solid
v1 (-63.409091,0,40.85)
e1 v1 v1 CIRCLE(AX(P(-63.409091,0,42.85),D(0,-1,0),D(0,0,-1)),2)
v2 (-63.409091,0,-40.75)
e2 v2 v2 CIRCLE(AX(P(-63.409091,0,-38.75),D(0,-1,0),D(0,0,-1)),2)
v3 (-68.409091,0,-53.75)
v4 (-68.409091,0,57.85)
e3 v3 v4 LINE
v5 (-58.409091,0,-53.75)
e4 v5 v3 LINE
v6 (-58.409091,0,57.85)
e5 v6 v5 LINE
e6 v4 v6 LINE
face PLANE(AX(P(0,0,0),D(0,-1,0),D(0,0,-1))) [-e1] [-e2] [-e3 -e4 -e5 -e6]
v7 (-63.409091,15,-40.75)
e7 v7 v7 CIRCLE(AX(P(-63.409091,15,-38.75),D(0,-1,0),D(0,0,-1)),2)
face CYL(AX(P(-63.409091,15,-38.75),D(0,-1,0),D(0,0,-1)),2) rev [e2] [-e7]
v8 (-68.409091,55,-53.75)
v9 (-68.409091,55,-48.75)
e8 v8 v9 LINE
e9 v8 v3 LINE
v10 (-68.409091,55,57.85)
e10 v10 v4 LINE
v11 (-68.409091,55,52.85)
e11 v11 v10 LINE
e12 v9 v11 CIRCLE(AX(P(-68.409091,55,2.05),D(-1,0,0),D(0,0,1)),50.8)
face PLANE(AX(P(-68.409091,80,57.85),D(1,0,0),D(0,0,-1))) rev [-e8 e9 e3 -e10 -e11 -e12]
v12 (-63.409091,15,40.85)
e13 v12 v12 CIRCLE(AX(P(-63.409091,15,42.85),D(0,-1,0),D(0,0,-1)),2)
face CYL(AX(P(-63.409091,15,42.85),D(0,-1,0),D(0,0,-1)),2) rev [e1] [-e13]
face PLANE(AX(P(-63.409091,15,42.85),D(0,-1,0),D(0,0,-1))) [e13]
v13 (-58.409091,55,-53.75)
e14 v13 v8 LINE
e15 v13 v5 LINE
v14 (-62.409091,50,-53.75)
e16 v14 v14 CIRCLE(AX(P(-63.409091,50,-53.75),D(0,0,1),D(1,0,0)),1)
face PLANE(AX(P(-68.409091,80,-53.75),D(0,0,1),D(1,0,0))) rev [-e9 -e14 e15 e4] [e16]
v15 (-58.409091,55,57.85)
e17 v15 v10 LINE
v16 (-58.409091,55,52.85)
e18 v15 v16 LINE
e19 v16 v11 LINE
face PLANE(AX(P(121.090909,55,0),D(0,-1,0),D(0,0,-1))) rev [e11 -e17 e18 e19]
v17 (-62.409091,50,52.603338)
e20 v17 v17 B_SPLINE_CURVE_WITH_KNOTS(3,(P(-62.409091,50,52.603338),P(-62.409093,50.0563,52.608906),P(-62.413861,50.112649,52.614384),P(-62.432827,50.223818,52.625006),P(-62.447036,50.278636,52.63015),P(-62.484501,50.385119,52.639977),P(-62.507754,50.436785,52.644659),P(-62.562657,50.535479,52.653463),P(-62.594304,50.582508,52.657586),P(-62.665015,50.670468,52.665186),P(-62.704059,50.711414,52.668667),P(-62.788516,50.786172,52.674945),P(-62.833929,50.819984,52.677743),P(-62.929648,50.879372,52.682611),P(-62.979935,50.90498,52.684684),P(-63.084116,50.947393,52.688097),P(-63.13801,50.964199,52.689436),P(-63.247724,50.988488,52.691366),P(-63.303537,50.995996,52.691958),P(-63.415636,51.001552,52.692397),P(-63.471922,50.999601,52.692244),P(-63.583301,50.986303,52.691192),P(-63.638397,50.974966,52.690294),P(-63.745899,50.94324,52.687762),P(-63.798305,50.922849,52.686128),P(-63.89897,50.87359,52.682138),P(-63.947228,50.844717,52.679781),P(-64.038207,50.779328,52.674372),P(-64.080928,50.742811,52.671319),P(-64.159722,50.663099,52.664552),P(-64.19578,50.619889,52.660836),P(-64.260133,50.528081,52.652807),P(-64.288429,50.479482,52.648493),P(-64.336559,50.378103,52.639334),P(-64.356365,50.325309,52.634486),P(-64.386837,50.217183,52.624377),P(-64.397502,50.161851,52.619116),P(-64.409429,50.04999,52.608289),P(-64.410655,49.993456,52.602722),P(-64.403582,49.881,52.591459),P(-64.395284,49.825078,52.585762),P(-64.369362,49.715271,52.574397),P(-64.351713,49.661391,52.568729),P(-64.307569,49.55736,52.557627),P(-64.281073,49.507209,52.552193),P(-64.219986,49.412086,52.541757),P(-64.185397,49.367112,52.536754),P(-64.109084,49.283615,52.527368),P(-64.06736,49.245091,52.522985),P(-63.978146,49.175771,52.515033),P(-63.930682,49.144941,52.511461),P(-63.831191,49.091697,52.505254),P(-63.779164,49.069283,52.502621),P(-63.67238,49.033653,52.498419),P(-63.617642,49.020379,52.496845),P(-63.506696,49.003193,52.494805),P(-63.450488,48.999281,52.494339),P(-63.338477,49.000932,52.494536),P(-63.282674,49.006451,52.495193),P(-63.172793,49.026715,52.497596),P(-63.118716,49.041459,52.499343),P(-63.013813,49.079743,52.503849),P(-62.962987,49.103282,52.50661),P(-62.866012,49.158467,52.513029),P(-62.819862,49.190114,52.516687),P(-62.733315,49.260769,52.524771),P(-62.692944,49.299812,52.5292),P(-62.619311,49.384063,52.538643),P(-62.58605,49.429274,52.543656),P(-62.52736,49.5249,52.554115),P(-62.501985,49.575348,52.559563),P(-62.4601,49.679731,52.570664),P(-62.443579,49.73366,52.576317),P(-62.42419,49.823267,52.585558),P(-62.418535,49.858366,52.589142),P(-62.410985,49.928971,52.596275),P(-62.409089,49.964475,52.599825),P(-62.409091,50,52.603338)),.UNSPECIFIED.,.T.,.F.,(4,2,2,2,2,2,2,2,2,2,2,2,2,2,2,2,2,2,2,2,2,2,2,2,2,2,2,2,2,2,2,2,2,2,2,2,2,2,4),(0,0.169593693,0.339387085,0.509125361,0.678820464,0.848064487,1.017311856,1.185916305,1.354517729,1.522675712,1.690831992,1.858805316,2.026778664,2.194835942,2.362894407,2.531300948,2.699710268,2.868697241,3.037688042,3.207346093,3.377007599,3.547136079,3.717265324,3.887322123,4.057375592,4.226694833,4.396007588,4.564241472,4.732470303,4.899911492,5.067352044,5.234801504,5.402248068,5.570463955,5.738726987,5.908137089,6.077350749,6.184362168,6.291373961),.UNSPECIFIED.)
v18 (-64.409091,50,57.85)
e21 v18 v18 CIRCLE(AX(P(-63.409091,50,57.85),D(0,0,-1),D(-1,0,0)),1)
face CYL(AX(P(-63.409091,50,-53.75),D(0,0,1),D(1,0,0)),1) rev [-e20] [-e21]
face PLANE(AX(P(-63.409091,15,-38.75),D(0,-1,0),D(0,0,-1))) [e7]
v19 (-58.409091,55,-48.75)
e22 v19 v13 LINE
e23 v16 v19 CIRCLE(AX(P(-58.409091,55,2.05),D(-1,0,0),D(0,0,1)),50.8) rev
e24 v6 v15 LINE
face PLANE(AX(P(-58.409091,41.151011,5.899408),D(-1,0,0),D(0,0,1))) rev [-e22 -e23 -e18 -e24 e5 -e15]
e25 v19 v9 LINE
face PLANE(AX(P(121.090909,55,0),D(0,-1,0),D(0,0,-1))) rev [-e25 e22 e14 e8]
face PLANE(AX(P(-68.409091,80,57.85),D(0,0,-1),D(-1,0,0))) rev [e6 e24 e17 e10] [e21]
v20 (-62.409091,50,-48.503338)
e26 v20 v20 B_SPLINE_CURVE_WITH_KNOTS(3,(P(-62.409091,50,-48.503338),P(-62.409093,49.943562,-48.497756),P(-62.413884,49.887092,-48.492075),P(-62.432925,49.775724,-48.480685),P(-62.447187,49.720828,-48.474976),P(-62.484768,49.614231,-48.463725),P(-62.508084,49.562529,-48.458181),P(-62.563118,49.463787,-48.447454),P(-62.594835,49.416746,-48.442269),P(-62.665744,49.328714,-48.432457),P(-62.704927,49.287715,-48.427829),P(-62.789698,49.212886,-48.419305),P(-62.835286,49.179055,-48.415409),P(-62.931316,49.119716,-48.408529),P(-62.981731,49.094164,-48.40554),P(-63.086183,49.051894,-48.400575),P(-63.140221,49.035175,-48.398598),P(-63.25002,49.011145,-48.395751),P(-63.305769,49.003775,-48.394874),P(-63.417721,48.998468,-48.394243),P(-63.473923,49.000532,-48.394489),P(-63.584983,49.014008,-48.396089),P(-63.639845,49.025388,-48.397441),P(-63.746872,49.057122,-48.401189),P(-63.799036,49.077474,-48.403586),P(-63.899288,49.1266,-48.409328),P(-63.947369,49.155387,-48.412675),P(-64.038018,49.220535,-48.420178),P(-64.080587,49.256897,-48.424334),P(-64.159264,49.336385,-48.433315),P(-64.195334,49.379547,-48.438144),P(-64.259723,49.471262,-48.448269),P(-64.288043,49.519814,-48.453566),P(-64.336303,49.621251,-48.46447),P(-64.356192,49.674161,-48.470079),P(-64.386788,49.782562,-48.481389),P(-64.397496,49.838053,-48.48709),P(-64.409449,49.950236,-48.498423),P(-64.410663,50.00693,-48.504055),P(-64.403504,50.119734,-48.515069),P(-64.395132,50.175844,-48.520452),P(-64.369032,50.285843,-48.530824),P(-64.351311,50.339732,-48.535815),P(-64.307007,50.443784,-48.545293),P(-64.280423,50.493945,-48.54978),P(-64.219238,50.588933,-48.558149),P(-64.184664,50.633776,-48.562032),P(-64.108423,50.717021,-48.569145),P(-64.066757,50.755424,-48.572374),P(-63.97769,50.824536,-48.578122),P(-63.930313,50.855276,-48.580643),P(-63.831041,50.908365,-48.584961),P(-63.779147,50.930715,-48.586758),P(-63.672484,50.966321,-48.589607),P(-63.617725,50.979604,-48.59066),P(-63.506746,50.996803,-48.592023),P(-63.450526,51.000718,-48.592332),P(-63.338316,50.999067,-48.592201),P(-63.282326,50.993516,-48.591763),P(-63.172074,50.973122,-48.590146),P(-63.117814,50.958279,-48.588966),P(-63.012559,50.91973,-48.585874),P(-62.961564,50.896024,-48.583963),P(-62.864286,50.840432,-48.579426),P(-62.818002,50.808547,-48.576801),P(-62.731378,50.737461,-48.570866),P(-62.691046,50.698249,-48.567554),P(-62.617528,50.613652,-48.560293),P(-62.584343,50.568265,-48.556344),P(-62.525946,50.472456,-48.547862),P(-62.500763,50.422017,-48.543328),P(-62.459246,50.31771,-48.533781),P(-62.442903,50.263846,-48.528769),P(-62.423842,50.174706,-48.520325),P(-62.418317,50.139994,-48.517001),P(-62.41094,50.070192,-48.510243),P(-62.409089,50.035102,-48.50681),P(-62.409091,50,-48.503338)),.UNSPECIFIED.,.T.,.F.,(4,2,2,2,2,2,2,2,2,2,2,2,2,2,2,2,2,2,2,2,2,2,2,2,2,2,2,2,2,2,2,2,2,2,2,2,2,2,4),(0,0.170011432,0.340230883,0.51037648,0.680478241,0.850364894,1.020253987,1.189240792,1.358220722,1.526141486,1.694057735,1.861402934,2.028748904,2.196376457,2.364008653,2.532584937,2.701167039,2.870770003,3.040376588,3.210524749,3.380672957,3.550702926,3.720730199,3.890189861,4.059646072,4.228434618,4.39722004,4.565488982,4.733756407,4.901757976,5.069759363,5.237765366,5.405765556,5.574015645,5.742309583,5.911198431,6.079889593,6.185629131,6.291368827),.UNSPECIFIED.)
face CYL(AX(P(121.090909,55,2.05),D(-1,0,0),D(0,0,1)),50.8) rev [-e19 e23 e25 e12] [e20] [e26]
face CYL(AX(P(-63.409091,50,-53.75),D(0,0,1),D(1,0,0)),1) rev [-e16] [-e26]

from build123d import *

# Parameters (mm, degrees)
SKETCH1_W               = 189.5
SKETCH1_H               = 111.6
BOSS_EXTRUDE1_DEPTH     = 80
SKETCH3_R               = 8.15
CUT_EXTRUDE2_DEPTH      = 40
SKETCH4_R               = 10.3
CUT_EXTRUDE3_DEPTH      = 40
CUT_EXTRUDE1_DEPTH      = 214.674688487
CUT_EXTRUDE5_START      = -10
SKETCH5_R               = 83.637561864
CUT_EXTRUDE5_DEPTH      = 196.625563976
SKETCH6_R               = 2
CUT_EXTRUDE6_DEPTH      = 15
CUT_EXTRUDE7_DEPTH      = 142.983674128
CUT_EXTRUDE7_DEPTH_BACK = 142.983674128
SKETCH7_R               = 1


with BuildPart() as part:
    # Sketch1 → Boss-Extrude1 (new body)
    with BuildSketch(Plane(origin=(0, 0, 0), x_dir=(1, 0, 0), z_dir=(0, 1, 0))):
        with Locations((26.340909091, -2.05)):
            Rectangle(SKETCH1_W, SKETCH1_H)
    extrude(amount=BOSS_EXTRUDE1_DEPTH)

    # Sketch3 → Cut-Extrude2 (cut)
    with BuildSketch(Plane.XY.offset(57.85)):
        with Locations((-6.709090909, 45)):
            Circle(SKETCH3_R)
        with Locations((44.290909091, 45)):
            Circle(SKETCH3_R)
        with Locations((95.290909091, 45)):
            Circle(SKETCH3_R)
    extrude(amount=-CUT_EXTRUDE2_DEPTH, mode=Mode.SUBTRACT)

    # Sketch4 → Cut-Extrude3 (cut)
    with BuildSketch(Plane(origin=(0, 0, -53.75), x_dir=(-1, 0, 0), z_dir=(0, 0, -1))):
        with Locations((-18.790909091, 45)):
            Circle(SKETCH4_R)
    extrude(amount=-CUT_EXTRUDE3_DEPTH, mode=Mode.SUBTRACT)

    # Sketch2 → Cut-Extrude1 (cut, through all)
    with BuildSketch(Plane.ZY.offset(68.409090909)):
        with BuildLine():
            Line((-53.75, 80), (-53.75, 55))
            Line((-53.75, 55), (-48.75, 55))
            ThreePointArc((-48.75, 55), (2.05, 4.2), (52.85, 55))
            Line((52.85, 55), (57.85, 55))
            Line((57.85, 55), (57.85, 80))
            Line((57.85, 80), (-53.75, 80))
        make_face()
    extrude(amount=-CUT_EXTRUDE1_DEPTH, mode=Mode.SUBTRACT)

    # Sketch5 → Cut-Extrude5 (cut, through all)
    with BuildSketch(Plane.ZY.offset(68.409090909).offset(CUT_EXTRUDE5_START)):
        with Locations((5.899408019, 41.151011042)):
            Circle(SKETCH5_R)
    extrude(amount=-CUT_EXTRUDE5_DEPTH, mode=Mode.SUBTRACT)

    # Sketch6 → Cut-Extrude6 (cut)
    with BuildSketch(Plane.XZ):
        with Locations((-63.409090909, 42.85)):
            Circle(SKETCH6_R)
        with Locations((-63.409090909, -38.75)):
            Circle(SKETCH6_R)
    extrude(amount=-CUT_EXTRUDE6_DEPTH, mode=Mode.SUBTRACT)

    # Sketch7 → Cut-Extrude7 (cut, two sides: drawn at the far end of the back side and taken through both)
    with BuildSketch(Plane.XY.offset(57.85).offset(-CUT_EXTRUDE7_DEPTH_BACK)):
        with Locations((-63.409090909, 50)):
            Circle(SKETCH7_R)
    extrude(amount=CUT_EXTRUDE7_DEPTH + CUT_EXTRUDE7_DEPTH_BACK, mode=Mode.SUBTRACT)


solid = part.part
